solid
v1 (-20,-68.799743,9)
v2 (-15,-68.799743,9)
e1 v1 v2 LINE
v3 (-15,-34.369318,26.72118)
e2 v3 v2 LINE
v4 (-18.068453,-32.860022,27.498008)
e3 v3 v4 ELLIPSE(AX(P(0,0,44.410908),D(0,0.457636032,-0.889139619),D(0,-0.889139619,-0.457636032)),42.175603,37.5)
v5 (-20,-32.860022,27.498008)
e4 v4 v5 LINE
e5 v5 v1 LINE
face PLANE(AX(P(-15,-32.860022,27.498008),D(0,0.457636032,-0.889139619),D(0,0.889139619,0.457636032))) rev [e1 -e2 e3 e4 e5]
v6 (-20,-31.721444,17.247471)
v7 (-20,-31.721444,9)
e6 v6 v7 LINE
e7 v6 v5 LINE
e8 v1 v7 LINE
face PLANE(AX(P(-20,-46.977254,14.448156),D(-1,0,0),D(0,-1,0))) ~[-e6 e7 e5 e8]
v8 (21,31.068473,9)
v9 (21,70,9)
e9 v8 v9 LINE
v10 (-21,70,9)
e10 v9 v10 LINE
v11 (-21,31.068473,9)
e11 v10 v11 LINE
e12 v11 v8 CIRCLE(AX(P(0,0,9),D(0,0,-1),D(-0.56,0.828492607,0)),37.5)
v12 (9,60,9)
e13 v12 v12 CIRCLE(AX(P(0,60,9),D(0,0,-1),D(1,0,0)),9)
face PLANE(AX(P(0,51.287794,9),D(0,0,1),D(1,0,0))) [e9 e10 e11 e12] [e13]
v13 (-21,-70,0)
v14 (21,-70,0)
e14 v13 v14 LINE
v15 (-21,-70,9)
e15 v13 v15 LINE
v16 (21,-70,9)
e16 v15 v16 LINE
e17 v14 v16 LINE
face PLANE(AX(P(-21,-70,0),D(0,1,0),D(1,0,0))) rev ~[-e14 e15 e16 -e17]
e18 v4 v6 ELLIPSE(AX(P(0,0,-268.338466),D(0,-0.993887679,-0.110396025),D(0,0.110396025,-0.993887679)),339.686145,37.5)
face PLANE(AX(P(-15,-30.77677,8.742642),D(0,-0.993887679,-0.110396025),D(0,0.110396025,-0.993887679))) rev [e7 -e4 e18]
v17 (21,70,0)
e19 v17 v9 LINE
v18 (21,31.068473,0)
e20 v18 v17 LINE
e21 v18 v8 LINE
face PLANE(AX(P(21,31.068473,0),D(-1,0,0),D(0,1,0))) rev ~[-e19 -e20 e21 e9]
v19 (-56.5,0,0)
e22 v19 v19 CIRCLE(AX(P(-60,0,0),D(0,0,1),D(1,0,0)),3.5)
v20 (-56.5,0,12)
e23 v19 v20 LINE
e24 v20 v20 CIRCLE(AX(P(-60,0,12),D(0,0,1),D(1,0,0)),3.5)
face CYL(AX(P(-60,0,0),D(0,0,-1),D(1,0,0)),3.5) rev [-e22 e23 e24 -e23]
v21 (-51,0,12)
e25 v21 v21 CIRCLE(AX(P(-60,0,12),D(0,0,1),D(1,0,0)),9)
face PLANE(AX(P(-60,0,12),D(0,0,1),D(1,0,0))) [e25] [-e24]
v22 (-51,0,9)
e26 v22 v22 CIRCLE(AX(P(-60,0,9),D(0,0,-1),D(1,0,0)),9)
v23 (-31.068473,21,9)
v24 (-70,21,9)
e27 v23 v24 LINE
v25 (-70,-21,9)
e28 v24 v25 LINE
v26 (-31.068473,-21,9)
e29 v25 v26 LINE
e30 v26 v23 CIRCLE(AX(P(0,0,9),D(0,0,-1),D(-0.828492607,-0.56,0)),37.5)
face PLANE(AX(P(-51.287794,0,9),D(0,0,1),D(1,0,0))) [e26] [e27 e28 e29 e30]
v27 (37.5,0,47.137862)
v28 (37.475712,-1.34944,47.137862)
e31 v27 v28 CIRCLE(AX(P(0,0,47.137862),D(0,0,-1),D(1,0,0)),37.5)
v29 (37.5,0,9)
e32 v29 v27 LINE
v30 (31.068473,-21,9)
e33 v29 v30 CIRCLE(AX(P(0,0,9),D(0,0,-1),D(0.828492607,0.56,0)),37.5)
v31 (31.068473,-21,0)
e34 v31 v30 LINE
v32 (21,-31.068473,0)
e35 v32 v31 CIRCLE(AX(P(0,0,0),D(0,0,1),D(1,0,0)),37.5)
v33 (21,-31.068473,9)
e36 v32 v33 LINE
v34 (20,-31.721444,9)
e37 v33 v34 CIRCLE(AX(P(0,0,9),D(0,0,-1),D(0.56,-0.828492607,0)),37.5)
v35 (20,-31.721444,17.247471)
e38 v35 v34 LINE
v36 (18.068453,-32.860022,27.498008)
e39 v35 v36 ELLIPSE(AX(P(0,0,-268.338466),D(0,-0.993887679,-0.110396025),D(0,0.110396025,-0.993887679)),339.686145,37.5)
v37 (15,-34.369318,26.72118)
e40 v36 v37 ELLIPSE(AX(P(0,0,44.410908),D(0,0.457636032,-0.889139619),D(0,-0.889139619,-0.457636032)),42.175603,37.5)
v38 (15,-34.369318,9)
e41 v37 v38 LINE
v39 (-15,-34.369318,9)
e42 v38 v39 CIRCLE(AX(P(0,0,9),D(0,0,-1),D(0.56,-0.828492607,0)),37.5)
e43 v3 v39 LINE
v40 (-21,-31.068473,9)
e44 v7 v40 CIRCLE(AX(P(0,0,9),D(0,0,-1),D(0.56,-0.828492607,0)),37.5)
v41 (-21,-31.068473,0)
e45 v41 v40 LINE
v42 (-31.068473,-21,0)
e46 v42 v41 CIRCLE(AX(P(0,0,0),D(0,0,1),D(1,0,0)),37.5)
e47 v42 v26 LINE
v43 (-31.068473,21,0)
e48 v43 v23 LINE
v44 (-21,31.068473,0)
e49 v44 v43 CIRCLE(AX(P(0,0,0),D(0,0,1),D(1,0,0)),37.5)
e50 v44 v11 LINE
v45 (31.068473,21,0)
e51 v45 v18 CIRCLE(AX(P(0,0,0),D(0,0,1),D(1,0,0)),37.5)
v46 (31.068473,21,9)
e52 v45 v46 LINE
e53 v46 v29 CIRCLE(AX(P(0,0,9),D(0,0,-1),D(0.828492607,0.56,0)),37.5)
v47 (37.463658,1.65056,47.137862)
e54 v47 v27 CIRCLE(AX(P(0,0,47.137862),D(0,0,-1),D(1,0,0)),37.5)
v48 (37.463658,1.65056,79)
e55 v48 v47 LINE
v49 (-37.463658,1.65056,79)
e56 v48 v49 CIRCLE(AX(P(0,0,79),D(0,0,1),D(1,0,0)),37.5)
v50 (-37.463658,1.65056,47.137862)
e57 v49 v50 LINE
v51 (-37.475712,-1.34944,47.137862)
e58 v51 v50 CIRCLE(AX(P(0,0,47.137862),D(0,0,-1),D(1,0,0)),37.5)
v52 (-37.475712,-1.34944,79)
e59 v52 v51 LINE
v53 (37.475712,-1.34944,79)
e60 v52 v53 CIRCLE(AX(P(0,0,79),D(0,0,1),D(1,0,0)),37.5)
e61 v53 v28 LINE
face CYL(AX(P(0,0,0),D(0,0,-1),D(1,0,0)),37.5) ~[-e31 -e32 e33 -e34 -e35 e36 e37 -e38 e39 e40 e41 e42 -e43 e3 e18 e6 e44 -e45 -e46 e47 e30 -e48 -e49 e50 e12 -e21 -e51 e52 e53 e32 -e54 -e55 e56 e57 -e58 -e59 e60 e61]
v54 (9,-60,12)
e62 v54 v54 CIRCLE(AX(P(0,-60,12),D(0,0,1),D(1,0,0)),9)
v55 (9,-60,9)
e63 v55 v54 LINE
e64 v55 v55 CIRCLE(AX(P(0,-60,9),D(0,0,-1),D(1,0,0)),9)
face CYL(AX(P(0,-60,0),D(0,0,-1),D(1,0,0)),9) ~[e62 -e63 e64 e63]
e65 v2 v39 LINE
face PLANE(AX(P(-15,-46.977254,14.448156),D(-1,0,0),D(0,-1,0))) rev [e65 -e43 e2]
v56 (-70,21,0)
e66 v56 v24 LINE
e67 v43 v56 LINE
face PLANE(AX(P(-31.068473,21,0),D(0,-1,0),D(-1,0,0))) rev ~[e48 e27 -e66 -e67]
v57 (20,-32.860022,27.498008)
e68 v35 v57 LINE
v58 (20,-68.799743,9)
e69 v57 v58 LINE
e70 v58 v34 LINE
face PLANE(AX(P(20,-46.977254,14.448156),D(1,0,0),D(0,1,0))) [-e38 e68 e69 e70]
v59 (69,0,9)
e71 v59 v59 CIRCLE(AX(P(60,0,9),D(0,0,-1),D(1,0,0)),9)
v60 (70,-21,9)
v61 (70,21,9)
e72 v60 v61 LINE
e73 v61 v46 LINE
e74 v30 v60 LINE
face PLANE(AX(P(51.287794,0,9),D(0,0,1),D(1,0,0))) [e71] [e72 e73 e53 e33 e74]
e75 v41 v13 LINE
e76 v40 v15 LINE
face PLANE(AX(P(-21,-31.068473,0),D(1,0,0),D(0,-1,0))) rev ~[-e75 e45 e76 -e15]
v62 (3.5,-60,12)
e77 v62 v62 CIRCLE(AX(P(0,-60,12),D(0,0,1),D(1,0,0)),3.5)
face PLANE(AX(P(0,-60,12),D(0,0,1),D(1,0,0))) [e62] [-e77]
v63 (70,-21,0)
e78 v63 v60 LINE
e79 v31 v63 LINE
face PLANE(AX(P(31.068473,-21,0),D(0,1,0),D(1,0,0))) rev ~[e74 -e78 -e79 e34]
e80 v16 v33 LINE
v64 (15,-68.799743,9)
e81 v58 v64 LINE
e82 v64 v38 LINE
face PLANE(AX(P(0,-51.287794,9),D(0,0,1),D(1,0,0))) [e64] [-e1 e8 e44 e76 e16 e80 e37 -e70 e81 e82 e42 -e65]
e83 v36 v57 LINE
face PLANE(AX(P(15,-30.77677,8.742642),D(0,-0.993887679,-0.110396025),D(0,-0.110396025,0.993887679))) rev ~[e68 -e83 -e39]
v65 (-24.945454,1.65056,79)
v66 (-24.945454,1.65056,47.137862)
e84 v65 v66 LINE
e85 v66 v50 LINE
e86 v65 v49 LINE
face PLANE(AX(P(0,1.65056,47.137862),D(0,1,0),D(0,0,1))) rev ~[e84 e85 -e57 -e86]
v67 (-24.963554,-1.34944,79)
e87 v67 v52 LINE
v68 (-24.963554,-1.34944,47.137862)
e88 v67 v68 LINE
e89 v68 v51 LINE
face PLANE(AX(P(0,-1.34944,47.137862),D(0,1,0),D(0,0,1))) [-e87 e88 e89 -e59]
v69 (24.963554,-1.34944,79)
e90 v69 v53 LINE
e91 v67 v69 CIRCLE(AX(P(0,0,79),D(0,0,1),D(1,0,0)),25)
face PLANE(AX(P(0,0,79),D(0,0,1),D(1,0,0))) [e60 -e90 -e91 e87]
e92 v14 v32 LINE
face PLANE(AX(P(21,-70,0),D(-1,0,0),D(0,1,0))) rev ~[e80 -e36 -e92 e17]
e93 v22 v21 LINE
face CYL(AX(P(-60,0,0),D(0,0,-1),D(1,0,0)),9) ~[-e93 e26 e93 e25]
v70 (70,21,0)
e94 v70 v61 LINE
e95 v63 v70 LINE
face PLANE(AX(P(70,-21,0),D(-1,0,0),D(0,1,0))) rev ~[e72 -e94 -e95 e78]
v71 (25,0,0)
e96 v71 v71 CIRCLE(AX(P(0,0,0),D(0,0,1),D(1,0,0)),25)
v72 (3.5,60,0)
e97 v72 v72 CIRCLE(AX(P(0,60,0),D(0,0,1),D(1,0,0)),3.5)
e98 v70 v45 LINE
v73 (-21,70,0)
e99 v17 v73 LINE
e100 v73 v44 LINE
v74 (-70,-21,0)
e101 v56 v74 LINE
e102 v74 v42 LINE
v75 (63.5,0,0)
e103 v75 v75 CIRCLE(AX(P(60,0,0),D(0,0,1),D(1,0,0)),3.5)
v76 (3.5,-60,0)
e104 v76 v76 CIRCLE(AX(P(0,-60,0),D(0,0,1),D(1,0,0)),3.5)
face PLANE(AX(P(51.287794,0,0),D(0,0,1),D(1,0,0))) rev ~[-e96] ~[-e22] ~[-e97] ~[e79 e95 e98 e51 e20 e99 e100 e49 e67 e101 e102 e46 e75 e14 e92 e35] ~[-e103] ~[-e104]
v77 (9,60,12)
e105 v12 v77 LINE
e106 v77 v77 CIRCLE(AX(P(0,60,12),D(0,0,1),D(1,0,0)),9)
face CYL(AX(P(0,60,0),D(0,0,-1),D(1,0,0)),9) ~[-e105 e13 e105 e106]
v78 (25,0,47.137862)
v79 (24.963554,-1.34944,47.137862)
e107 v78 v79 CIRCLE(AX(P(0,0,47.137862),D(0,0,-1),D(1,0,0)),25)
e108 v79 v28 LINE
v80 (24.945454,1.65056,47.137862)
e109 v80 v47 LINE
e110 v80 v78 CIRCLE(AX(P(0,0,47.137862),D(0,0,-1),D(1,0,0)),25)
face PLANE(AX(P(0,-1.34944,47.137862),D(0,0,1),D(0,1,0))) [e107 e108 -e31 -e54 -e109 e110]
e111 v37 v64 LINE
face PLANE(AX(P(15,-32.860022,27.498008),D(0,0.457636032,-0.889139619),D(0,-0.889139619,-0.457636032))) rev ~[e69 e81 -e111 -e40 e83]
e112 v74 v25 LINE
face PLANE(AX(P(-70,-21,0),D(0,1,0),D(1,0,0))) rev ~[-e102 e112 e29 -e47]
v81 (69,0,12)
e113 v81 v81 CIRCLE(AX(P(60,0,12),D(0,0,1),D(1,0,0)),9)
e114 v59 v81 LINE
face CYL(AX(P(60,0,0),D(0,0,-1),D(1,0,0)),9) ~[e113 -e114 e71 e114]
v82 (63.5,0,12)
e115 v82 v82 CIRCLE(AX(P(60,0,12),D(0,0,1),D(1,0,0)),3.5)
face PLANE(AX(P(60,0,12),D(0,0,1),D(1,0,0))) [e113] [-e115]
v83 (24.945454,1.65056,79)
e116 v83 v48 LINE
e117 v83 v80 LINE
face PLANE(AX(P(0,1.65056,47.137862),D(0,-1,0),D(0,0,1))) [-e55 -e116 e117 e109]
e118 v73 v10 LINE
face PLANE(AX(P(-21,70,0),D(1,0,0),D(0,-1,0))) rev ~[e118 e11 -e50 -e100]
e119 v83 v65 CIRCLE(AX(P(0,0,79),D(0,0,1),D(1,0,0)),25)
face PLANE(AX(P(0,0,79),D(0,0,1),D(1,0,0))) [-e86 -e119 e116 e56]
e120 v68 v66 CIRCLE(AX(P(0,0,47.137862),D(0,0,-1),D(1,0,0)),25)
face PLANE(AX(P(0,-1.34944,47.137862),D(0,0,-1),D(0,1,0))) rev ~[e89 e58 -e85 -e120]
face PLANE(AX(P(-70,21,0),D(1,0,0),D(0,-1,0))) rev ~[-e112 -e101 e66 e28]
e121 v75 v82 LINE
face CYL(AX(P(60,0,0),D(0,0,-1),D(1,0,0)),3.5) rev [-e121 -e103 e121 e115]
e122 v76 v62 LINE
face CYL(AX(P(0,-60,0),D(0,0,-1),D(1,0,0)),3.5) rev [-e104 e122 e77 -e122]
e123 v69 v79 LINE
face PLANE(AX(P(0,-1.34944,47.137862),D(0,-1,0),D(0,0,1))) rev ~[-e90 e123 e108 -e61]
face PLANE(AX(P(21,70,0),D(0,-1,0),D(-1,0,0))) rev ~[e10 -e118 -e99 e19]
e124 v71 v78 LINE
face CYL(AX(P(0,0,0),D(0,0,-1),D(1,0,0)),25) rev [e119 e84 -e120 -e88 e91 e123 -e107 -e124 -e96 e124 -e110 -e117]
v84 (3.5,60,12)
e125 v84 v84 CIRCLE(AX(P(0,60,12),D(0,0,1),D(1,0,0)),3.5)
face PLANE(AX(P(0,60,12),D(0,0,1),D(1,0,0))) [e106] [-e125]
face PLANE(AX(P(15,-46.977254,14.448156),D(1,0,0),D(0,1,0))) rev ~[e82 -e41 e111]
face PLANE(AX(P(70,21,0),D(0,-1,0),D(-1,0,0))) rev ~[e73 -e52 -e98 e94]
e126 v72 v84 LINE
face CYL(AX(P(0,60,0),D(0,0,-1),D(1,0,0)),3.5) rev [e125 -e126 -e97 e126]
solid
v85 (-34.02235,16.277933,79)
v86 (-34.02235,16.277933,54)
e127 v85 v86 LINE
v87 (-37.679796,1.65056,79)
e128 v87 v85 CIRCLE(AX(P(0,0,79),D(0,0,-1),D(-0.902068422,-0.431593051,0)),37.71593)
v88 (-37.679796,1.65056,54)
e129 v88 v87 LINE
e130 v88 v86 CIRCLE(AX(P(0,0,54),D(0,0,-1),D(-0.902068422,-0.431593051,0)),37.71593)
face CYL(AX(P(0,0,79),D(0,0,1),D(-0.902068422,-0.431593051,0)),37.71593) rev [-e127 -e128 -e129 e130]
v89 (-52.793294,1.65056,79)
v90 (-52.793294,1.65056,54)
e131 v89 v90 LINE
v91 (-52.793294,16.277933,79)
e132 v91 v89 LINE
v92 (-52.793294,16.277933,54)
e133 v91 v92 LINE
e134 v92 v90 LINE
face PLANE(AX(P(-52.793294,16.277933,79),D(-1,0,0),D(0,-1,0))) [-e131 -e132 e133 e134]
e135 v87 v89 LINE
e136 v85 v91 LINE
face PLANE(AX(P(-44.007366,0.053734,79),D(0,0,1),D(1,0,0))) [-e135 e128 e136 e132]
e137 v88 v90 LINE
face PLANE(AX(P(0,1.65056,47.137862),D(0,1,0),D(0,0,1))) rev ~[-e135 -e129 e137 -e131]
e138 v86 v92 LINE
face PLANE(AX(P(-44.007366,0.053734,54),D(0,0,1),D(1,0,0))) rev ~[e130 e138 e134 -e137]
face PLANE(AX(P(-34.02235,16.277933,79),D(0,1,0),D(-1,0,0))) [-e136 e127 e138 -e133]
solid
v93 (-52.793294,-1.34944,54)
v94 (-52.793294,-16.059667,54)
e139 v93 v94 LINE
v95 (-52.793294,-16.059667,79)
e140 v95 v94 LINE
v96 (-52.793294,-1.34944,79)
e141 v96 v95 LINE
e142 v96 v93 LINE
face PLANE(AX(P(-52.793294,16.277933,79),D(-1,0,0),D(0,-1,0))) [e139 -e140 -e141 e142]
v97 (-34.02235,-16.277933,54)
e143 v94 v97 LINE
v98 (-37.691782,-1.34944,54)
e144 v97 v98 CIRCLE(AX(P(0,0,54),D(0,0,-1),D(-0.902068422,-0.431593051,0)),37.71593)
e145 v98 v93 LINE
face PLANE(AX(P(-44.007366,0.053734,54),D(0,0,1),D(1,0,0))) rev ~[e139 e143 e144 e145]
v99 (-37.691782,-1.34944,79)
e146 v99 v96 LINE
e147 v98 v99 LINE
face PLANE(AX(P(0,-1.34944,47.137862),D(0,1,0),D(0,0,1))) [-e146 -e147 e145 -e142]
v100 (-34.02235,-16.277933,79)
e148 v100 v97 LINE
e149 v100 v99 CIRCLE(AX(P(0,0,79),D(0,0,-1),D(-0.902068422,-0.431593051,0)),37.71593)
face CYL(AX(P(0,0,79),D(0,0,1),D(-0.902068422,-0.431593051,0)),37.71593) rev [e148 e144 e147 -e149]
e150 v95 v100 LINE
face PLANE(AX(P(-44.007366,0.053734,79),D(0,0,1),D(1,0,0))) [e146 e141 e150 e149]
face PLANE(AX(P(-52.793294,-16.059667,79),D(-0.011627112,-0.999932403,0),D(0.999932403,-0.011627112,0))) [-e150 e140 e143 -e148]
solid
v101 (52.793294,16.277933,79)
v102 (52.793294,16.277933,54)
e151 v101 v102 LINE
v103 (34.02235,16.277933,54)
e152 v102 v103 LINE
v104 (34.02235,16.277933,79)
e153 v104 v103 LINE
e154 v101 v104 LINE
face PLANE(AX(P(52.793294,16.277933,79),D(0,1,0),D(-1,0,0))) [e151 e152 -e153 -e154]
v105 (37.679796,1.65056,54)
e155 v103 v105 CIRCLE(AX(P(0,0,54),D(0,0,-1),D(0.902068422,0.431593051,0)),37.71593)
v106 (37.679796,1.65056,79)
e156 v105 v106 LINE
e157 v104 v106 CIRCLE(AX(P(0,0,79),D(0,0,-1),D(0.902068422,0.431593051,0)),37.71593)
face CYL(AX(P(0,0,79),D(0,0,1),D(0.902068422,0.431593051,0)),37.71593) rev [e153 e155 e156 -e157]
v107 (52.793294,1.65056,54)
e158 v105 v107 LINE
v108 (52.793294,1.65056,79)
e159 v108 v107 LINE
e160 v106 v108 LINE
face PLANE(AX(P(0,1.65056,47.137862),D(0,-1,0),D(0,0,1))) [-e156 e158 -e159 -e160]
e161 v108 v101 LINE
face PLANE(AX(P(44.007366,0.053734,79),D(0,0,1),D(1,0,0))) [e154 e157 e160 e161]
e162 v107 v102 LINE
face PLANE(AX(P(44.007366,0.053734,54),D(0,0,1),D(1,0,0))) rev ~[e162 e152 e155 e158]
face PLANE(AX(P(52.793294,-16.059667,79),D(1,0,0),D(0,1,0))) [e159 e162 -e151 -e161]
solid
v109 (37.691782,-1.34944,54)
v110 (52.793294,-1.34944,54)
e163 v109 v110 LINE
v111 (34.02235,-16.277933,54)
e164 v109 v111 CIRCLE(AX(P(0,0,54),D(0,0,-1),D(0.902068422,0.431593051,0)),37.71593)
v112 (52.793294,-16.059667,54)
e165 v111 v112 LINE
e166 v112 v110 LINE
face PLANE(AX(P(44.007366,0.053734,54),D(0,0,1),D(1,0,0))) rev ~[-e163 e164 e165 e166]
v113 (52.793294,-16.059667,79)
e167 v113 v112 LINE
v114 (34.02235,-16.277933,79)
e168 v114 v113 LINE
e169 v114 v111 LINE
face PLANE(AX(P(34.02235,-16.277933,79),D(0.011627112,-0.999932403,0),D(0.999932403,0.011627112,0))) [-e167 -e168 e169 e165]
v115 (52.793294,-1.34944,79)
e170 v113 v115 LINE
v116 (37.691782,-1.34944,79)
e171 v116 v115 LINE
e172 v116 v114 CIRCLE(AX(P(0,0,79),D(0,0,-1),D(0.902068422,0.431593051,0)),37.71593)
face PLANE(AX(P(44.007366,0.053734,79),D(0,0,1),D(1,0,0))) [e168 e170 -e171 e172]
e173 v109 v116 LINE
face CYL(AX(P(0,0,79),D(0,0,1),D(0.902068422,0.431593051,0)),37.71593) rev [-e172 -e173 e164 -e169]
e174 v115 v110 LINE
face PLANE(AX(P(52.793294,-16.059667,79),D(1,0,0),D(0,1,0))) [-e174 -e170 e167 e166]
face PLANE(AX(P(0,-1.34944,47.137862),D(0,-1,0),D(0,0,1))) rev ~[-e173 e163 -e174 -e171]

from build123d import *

# Parameters (mm, degrees)
F0_R      = 37.5
F0_R_2    = 25
F1_DEPTH  = 79
F3_DEPTH  = 9
F4_R      = 4
F5_DEPTH  = 10
F6_DEPTH  = 25
F7_R      = 9
F7_R_2    = 3.5
F8_DEPTH  = 12
F12_DEPTH = 25
F9_W      = 3
F9_H      = 35
F13_DEPTH = 70.001
F14_DEPTH = 70.001
F17_DEPTH = 5


# Not quite as in the source:
# - a pattern or mirror of a feature is missing from the dataset's text; its kind, count and spacing are read off the source's solid


with BuildPart() as f1:
    # F0 (on Top) → F1 (new body)
    with BuildSketch(Plane.XY):
        Circle(F0_R)
        Circle(F0_R_2, mode=Mode.SUBTRACT)
    extrude(amount=F1_DEPTH)

    # F2 (on Top) → F3 (join)
    with BuildSketch(Plane.XY):
        with BuildLine():
            Line((-21, 70), (-21, 31.0684727658))
            ThreePointArc((-21, 31.0684727658), (0, 37.5), (21, 31.0684727658))
            Line((21, 31.0684727658), (21, 70))
            Line((21, 70), (-21, 70))
        make_face()
        with BuildLine():
            Line((-70, -21), (-31.0684727658, -21))
            ThreePointArc((-31.0684727658, -21), (-37.5, 0), (-31.0684727658, 21))
            Line((-31.0684727658, 21), (-70, 21))
            Line((-70, 21), (-70, -21))
        make_face()
        with BuildLine():
            Line((21, -70), (21, -31.0684727658))
            ThreePointArc((21, -31.0684727658), (0, -37.5), (-21, -31.0684727658))
            Line((-21, -31.0684727658), (-21, -70))
            Line((-21, -70), (21, -70))
        make_face()
        with BuildLine():
            Line((70, 21), (31.0684727658, 21))
            ThreePointArc((31.0684727658, 21), (37.5, 0), (31.0684727658, -21))
            Line((31.0684727658, -21), (70, -21))
            Line((70, -21), (70, 21))
        make_face()
    extrude(amount=F3_DEPTH)

    # F4 (on Top) → F5 (cut)
    with BuildSketch(Plane.XY):
        with Locations((-60, 0)):
            Circle(F4_R)
        with Locations((0, -60)):
            Circle(F4_R)
        with Locations((60, 0)):
            Circle(F4_R)
        with Locations((0, 60)):
            Circle(F4_R)
    extrude(amount=F5_DEPTH, mode=Mode.SUBTRACT)

    # F4 (on Top) → F6 (cut)
    with BuildSketch(Plane.XY):
        with Locations((-60, 0)):
            Circle(F4_R)
        with Locations((0, -60)):
            Circle(F4_R)
        with Locations((60, 0)):
            Circle(F4_R)
        with Locations((0, 60)):
            Circle(F4_R)
    extrude(amount=F6_DEPTH, mode=Mode.SUBTRACT)

    # F7 (on Top) → F8 (join)
    with BuildSketch(Plane.XY):
        with Locations((-60, 0)):
            Circle(F7_R)
        with Locations((-60, 0)):
            Circle(F7_R_2, mode=Mode.SUBTRACT)
        with Locations((0, -60)):
            Circle(F7_R)
        with Locations((0, -60)):
            Circle(F7_R_2, mode=Mode.SUBTRACT)
        with Locations((60, 0)):
            Circle(F7_R)
        with Locations((60, 0)):
            Circle(F7_R_2, mode=Mode.SUBTRACT)
        with Locations((0, 60)):
            Circle(F7_R)
        with Locations((0, 60)):
            Circle(F7_R_2, mode=Mode.SUBTRACT)
    extrude(amount=F8_DEPTH)


with BuildPart() as f12:
    # F11 (on offset) → F12 (new body)
    with BuildSketch(Plane.XY.offset(79)):
        with BuildLine():
            Line((52.7932941914, 16.2779334933), (34.0223498642, 16.2779334933))
            ThreePointArc((34.0223498642, 16.2779334933), (37.7159304419, 0), (34.0223498642, -16.2779334933))
            Line((34.0223498642, -16.2779334933), (52.7932941914, -16.0596668599))
            Line((52.7932941914, -16.0596668599), (52.7932941914, 16.2779334933))
        make_face()
    extrude(amount=-F12_DEPTH)


with BuildPart() as f12b:
    # F11 (on offset) → F12, piece 2 (new body)
    with BuildSketch(Plane.XY.offset(79)):
        with BuildLine():
            ThreePointArc((-34.0223498642, -16.2779334933), (-37.7159304419, 0), (-34.0223498642, 16.2779334933))
            Line((-34.0223498642, 16.2779334933), (-52.7932941914, 16.2779334933))
            Line((-52.7932941914, 16.2779334933), (-52.7932941914, -16.0596668599))
            Line((-52.7932941914, -16.0596668599), (-34.0223498642, -16.2779334933))
        make_face()
    extrude(amount=-F12_DEPTH)


with BuildPart() as f13_tool:
    # F9 (on Right) → F13 (new body, through all)
    with BuildSketch(Plane.YZ):
        with Locations((0.1505599357, 64.6378623207)):
            Rectangle(F9_W, F9_H)
    extrude(amount=-F13_DEPTH)


with BuildPart() as f1_1:
    add(f1.part)

    # F13: cut by f13_tool
    add(f13_tool.part, mode=Mode.SUBTRACT)


with BuildPart() as f12b_1:
    add(f12b.part)

    # F13: cut by f13_tool
    add(f13_tool.part, mode=Mode.SUBTRACT)


with BuildPart() as f14_tool:
    # F9 (on Right) → F14 (new body, through all)
    with BuildSketch(Plane.YZ):
        with Locations((0.1505599357, 64.6378623207)):
            Rectangle(F9_W, F9_H)
    extrude(amount=F14_DEPTH)


with BuildPart() as f1_2:
    add(f1_1.part)

    # F14: cut by f14_tool
    add(f14_tool.part, mode=Mode.SUBTRACT)

    # F16 (on offset) → F17 (join)
    with BuildSketch(Plane.YZ.offset(15)):
        Polygon((-30.7767703821, 8.7426423561), (-32.8600216546, 27.4980076705), (-69.2997624506, 8.7426423561), align=None)
    f17 = extrude(amount=F17_DEPTH)

    # F17_copies: F17 across plane
    add(f17.mirror(Plane(origin=(0, 0, 0), x_dir=(0, 0, -1), z_dir=(-1, 0, 0))))


with BuildPart() as f12_1:
    add(f12.part)

    # F14: cut by f14_tool
    add(f14_tool.part, mode=Mode.SUBTRACT)


solid = Compound([f12b_1.part, f1_2.part, f12_1.part])
